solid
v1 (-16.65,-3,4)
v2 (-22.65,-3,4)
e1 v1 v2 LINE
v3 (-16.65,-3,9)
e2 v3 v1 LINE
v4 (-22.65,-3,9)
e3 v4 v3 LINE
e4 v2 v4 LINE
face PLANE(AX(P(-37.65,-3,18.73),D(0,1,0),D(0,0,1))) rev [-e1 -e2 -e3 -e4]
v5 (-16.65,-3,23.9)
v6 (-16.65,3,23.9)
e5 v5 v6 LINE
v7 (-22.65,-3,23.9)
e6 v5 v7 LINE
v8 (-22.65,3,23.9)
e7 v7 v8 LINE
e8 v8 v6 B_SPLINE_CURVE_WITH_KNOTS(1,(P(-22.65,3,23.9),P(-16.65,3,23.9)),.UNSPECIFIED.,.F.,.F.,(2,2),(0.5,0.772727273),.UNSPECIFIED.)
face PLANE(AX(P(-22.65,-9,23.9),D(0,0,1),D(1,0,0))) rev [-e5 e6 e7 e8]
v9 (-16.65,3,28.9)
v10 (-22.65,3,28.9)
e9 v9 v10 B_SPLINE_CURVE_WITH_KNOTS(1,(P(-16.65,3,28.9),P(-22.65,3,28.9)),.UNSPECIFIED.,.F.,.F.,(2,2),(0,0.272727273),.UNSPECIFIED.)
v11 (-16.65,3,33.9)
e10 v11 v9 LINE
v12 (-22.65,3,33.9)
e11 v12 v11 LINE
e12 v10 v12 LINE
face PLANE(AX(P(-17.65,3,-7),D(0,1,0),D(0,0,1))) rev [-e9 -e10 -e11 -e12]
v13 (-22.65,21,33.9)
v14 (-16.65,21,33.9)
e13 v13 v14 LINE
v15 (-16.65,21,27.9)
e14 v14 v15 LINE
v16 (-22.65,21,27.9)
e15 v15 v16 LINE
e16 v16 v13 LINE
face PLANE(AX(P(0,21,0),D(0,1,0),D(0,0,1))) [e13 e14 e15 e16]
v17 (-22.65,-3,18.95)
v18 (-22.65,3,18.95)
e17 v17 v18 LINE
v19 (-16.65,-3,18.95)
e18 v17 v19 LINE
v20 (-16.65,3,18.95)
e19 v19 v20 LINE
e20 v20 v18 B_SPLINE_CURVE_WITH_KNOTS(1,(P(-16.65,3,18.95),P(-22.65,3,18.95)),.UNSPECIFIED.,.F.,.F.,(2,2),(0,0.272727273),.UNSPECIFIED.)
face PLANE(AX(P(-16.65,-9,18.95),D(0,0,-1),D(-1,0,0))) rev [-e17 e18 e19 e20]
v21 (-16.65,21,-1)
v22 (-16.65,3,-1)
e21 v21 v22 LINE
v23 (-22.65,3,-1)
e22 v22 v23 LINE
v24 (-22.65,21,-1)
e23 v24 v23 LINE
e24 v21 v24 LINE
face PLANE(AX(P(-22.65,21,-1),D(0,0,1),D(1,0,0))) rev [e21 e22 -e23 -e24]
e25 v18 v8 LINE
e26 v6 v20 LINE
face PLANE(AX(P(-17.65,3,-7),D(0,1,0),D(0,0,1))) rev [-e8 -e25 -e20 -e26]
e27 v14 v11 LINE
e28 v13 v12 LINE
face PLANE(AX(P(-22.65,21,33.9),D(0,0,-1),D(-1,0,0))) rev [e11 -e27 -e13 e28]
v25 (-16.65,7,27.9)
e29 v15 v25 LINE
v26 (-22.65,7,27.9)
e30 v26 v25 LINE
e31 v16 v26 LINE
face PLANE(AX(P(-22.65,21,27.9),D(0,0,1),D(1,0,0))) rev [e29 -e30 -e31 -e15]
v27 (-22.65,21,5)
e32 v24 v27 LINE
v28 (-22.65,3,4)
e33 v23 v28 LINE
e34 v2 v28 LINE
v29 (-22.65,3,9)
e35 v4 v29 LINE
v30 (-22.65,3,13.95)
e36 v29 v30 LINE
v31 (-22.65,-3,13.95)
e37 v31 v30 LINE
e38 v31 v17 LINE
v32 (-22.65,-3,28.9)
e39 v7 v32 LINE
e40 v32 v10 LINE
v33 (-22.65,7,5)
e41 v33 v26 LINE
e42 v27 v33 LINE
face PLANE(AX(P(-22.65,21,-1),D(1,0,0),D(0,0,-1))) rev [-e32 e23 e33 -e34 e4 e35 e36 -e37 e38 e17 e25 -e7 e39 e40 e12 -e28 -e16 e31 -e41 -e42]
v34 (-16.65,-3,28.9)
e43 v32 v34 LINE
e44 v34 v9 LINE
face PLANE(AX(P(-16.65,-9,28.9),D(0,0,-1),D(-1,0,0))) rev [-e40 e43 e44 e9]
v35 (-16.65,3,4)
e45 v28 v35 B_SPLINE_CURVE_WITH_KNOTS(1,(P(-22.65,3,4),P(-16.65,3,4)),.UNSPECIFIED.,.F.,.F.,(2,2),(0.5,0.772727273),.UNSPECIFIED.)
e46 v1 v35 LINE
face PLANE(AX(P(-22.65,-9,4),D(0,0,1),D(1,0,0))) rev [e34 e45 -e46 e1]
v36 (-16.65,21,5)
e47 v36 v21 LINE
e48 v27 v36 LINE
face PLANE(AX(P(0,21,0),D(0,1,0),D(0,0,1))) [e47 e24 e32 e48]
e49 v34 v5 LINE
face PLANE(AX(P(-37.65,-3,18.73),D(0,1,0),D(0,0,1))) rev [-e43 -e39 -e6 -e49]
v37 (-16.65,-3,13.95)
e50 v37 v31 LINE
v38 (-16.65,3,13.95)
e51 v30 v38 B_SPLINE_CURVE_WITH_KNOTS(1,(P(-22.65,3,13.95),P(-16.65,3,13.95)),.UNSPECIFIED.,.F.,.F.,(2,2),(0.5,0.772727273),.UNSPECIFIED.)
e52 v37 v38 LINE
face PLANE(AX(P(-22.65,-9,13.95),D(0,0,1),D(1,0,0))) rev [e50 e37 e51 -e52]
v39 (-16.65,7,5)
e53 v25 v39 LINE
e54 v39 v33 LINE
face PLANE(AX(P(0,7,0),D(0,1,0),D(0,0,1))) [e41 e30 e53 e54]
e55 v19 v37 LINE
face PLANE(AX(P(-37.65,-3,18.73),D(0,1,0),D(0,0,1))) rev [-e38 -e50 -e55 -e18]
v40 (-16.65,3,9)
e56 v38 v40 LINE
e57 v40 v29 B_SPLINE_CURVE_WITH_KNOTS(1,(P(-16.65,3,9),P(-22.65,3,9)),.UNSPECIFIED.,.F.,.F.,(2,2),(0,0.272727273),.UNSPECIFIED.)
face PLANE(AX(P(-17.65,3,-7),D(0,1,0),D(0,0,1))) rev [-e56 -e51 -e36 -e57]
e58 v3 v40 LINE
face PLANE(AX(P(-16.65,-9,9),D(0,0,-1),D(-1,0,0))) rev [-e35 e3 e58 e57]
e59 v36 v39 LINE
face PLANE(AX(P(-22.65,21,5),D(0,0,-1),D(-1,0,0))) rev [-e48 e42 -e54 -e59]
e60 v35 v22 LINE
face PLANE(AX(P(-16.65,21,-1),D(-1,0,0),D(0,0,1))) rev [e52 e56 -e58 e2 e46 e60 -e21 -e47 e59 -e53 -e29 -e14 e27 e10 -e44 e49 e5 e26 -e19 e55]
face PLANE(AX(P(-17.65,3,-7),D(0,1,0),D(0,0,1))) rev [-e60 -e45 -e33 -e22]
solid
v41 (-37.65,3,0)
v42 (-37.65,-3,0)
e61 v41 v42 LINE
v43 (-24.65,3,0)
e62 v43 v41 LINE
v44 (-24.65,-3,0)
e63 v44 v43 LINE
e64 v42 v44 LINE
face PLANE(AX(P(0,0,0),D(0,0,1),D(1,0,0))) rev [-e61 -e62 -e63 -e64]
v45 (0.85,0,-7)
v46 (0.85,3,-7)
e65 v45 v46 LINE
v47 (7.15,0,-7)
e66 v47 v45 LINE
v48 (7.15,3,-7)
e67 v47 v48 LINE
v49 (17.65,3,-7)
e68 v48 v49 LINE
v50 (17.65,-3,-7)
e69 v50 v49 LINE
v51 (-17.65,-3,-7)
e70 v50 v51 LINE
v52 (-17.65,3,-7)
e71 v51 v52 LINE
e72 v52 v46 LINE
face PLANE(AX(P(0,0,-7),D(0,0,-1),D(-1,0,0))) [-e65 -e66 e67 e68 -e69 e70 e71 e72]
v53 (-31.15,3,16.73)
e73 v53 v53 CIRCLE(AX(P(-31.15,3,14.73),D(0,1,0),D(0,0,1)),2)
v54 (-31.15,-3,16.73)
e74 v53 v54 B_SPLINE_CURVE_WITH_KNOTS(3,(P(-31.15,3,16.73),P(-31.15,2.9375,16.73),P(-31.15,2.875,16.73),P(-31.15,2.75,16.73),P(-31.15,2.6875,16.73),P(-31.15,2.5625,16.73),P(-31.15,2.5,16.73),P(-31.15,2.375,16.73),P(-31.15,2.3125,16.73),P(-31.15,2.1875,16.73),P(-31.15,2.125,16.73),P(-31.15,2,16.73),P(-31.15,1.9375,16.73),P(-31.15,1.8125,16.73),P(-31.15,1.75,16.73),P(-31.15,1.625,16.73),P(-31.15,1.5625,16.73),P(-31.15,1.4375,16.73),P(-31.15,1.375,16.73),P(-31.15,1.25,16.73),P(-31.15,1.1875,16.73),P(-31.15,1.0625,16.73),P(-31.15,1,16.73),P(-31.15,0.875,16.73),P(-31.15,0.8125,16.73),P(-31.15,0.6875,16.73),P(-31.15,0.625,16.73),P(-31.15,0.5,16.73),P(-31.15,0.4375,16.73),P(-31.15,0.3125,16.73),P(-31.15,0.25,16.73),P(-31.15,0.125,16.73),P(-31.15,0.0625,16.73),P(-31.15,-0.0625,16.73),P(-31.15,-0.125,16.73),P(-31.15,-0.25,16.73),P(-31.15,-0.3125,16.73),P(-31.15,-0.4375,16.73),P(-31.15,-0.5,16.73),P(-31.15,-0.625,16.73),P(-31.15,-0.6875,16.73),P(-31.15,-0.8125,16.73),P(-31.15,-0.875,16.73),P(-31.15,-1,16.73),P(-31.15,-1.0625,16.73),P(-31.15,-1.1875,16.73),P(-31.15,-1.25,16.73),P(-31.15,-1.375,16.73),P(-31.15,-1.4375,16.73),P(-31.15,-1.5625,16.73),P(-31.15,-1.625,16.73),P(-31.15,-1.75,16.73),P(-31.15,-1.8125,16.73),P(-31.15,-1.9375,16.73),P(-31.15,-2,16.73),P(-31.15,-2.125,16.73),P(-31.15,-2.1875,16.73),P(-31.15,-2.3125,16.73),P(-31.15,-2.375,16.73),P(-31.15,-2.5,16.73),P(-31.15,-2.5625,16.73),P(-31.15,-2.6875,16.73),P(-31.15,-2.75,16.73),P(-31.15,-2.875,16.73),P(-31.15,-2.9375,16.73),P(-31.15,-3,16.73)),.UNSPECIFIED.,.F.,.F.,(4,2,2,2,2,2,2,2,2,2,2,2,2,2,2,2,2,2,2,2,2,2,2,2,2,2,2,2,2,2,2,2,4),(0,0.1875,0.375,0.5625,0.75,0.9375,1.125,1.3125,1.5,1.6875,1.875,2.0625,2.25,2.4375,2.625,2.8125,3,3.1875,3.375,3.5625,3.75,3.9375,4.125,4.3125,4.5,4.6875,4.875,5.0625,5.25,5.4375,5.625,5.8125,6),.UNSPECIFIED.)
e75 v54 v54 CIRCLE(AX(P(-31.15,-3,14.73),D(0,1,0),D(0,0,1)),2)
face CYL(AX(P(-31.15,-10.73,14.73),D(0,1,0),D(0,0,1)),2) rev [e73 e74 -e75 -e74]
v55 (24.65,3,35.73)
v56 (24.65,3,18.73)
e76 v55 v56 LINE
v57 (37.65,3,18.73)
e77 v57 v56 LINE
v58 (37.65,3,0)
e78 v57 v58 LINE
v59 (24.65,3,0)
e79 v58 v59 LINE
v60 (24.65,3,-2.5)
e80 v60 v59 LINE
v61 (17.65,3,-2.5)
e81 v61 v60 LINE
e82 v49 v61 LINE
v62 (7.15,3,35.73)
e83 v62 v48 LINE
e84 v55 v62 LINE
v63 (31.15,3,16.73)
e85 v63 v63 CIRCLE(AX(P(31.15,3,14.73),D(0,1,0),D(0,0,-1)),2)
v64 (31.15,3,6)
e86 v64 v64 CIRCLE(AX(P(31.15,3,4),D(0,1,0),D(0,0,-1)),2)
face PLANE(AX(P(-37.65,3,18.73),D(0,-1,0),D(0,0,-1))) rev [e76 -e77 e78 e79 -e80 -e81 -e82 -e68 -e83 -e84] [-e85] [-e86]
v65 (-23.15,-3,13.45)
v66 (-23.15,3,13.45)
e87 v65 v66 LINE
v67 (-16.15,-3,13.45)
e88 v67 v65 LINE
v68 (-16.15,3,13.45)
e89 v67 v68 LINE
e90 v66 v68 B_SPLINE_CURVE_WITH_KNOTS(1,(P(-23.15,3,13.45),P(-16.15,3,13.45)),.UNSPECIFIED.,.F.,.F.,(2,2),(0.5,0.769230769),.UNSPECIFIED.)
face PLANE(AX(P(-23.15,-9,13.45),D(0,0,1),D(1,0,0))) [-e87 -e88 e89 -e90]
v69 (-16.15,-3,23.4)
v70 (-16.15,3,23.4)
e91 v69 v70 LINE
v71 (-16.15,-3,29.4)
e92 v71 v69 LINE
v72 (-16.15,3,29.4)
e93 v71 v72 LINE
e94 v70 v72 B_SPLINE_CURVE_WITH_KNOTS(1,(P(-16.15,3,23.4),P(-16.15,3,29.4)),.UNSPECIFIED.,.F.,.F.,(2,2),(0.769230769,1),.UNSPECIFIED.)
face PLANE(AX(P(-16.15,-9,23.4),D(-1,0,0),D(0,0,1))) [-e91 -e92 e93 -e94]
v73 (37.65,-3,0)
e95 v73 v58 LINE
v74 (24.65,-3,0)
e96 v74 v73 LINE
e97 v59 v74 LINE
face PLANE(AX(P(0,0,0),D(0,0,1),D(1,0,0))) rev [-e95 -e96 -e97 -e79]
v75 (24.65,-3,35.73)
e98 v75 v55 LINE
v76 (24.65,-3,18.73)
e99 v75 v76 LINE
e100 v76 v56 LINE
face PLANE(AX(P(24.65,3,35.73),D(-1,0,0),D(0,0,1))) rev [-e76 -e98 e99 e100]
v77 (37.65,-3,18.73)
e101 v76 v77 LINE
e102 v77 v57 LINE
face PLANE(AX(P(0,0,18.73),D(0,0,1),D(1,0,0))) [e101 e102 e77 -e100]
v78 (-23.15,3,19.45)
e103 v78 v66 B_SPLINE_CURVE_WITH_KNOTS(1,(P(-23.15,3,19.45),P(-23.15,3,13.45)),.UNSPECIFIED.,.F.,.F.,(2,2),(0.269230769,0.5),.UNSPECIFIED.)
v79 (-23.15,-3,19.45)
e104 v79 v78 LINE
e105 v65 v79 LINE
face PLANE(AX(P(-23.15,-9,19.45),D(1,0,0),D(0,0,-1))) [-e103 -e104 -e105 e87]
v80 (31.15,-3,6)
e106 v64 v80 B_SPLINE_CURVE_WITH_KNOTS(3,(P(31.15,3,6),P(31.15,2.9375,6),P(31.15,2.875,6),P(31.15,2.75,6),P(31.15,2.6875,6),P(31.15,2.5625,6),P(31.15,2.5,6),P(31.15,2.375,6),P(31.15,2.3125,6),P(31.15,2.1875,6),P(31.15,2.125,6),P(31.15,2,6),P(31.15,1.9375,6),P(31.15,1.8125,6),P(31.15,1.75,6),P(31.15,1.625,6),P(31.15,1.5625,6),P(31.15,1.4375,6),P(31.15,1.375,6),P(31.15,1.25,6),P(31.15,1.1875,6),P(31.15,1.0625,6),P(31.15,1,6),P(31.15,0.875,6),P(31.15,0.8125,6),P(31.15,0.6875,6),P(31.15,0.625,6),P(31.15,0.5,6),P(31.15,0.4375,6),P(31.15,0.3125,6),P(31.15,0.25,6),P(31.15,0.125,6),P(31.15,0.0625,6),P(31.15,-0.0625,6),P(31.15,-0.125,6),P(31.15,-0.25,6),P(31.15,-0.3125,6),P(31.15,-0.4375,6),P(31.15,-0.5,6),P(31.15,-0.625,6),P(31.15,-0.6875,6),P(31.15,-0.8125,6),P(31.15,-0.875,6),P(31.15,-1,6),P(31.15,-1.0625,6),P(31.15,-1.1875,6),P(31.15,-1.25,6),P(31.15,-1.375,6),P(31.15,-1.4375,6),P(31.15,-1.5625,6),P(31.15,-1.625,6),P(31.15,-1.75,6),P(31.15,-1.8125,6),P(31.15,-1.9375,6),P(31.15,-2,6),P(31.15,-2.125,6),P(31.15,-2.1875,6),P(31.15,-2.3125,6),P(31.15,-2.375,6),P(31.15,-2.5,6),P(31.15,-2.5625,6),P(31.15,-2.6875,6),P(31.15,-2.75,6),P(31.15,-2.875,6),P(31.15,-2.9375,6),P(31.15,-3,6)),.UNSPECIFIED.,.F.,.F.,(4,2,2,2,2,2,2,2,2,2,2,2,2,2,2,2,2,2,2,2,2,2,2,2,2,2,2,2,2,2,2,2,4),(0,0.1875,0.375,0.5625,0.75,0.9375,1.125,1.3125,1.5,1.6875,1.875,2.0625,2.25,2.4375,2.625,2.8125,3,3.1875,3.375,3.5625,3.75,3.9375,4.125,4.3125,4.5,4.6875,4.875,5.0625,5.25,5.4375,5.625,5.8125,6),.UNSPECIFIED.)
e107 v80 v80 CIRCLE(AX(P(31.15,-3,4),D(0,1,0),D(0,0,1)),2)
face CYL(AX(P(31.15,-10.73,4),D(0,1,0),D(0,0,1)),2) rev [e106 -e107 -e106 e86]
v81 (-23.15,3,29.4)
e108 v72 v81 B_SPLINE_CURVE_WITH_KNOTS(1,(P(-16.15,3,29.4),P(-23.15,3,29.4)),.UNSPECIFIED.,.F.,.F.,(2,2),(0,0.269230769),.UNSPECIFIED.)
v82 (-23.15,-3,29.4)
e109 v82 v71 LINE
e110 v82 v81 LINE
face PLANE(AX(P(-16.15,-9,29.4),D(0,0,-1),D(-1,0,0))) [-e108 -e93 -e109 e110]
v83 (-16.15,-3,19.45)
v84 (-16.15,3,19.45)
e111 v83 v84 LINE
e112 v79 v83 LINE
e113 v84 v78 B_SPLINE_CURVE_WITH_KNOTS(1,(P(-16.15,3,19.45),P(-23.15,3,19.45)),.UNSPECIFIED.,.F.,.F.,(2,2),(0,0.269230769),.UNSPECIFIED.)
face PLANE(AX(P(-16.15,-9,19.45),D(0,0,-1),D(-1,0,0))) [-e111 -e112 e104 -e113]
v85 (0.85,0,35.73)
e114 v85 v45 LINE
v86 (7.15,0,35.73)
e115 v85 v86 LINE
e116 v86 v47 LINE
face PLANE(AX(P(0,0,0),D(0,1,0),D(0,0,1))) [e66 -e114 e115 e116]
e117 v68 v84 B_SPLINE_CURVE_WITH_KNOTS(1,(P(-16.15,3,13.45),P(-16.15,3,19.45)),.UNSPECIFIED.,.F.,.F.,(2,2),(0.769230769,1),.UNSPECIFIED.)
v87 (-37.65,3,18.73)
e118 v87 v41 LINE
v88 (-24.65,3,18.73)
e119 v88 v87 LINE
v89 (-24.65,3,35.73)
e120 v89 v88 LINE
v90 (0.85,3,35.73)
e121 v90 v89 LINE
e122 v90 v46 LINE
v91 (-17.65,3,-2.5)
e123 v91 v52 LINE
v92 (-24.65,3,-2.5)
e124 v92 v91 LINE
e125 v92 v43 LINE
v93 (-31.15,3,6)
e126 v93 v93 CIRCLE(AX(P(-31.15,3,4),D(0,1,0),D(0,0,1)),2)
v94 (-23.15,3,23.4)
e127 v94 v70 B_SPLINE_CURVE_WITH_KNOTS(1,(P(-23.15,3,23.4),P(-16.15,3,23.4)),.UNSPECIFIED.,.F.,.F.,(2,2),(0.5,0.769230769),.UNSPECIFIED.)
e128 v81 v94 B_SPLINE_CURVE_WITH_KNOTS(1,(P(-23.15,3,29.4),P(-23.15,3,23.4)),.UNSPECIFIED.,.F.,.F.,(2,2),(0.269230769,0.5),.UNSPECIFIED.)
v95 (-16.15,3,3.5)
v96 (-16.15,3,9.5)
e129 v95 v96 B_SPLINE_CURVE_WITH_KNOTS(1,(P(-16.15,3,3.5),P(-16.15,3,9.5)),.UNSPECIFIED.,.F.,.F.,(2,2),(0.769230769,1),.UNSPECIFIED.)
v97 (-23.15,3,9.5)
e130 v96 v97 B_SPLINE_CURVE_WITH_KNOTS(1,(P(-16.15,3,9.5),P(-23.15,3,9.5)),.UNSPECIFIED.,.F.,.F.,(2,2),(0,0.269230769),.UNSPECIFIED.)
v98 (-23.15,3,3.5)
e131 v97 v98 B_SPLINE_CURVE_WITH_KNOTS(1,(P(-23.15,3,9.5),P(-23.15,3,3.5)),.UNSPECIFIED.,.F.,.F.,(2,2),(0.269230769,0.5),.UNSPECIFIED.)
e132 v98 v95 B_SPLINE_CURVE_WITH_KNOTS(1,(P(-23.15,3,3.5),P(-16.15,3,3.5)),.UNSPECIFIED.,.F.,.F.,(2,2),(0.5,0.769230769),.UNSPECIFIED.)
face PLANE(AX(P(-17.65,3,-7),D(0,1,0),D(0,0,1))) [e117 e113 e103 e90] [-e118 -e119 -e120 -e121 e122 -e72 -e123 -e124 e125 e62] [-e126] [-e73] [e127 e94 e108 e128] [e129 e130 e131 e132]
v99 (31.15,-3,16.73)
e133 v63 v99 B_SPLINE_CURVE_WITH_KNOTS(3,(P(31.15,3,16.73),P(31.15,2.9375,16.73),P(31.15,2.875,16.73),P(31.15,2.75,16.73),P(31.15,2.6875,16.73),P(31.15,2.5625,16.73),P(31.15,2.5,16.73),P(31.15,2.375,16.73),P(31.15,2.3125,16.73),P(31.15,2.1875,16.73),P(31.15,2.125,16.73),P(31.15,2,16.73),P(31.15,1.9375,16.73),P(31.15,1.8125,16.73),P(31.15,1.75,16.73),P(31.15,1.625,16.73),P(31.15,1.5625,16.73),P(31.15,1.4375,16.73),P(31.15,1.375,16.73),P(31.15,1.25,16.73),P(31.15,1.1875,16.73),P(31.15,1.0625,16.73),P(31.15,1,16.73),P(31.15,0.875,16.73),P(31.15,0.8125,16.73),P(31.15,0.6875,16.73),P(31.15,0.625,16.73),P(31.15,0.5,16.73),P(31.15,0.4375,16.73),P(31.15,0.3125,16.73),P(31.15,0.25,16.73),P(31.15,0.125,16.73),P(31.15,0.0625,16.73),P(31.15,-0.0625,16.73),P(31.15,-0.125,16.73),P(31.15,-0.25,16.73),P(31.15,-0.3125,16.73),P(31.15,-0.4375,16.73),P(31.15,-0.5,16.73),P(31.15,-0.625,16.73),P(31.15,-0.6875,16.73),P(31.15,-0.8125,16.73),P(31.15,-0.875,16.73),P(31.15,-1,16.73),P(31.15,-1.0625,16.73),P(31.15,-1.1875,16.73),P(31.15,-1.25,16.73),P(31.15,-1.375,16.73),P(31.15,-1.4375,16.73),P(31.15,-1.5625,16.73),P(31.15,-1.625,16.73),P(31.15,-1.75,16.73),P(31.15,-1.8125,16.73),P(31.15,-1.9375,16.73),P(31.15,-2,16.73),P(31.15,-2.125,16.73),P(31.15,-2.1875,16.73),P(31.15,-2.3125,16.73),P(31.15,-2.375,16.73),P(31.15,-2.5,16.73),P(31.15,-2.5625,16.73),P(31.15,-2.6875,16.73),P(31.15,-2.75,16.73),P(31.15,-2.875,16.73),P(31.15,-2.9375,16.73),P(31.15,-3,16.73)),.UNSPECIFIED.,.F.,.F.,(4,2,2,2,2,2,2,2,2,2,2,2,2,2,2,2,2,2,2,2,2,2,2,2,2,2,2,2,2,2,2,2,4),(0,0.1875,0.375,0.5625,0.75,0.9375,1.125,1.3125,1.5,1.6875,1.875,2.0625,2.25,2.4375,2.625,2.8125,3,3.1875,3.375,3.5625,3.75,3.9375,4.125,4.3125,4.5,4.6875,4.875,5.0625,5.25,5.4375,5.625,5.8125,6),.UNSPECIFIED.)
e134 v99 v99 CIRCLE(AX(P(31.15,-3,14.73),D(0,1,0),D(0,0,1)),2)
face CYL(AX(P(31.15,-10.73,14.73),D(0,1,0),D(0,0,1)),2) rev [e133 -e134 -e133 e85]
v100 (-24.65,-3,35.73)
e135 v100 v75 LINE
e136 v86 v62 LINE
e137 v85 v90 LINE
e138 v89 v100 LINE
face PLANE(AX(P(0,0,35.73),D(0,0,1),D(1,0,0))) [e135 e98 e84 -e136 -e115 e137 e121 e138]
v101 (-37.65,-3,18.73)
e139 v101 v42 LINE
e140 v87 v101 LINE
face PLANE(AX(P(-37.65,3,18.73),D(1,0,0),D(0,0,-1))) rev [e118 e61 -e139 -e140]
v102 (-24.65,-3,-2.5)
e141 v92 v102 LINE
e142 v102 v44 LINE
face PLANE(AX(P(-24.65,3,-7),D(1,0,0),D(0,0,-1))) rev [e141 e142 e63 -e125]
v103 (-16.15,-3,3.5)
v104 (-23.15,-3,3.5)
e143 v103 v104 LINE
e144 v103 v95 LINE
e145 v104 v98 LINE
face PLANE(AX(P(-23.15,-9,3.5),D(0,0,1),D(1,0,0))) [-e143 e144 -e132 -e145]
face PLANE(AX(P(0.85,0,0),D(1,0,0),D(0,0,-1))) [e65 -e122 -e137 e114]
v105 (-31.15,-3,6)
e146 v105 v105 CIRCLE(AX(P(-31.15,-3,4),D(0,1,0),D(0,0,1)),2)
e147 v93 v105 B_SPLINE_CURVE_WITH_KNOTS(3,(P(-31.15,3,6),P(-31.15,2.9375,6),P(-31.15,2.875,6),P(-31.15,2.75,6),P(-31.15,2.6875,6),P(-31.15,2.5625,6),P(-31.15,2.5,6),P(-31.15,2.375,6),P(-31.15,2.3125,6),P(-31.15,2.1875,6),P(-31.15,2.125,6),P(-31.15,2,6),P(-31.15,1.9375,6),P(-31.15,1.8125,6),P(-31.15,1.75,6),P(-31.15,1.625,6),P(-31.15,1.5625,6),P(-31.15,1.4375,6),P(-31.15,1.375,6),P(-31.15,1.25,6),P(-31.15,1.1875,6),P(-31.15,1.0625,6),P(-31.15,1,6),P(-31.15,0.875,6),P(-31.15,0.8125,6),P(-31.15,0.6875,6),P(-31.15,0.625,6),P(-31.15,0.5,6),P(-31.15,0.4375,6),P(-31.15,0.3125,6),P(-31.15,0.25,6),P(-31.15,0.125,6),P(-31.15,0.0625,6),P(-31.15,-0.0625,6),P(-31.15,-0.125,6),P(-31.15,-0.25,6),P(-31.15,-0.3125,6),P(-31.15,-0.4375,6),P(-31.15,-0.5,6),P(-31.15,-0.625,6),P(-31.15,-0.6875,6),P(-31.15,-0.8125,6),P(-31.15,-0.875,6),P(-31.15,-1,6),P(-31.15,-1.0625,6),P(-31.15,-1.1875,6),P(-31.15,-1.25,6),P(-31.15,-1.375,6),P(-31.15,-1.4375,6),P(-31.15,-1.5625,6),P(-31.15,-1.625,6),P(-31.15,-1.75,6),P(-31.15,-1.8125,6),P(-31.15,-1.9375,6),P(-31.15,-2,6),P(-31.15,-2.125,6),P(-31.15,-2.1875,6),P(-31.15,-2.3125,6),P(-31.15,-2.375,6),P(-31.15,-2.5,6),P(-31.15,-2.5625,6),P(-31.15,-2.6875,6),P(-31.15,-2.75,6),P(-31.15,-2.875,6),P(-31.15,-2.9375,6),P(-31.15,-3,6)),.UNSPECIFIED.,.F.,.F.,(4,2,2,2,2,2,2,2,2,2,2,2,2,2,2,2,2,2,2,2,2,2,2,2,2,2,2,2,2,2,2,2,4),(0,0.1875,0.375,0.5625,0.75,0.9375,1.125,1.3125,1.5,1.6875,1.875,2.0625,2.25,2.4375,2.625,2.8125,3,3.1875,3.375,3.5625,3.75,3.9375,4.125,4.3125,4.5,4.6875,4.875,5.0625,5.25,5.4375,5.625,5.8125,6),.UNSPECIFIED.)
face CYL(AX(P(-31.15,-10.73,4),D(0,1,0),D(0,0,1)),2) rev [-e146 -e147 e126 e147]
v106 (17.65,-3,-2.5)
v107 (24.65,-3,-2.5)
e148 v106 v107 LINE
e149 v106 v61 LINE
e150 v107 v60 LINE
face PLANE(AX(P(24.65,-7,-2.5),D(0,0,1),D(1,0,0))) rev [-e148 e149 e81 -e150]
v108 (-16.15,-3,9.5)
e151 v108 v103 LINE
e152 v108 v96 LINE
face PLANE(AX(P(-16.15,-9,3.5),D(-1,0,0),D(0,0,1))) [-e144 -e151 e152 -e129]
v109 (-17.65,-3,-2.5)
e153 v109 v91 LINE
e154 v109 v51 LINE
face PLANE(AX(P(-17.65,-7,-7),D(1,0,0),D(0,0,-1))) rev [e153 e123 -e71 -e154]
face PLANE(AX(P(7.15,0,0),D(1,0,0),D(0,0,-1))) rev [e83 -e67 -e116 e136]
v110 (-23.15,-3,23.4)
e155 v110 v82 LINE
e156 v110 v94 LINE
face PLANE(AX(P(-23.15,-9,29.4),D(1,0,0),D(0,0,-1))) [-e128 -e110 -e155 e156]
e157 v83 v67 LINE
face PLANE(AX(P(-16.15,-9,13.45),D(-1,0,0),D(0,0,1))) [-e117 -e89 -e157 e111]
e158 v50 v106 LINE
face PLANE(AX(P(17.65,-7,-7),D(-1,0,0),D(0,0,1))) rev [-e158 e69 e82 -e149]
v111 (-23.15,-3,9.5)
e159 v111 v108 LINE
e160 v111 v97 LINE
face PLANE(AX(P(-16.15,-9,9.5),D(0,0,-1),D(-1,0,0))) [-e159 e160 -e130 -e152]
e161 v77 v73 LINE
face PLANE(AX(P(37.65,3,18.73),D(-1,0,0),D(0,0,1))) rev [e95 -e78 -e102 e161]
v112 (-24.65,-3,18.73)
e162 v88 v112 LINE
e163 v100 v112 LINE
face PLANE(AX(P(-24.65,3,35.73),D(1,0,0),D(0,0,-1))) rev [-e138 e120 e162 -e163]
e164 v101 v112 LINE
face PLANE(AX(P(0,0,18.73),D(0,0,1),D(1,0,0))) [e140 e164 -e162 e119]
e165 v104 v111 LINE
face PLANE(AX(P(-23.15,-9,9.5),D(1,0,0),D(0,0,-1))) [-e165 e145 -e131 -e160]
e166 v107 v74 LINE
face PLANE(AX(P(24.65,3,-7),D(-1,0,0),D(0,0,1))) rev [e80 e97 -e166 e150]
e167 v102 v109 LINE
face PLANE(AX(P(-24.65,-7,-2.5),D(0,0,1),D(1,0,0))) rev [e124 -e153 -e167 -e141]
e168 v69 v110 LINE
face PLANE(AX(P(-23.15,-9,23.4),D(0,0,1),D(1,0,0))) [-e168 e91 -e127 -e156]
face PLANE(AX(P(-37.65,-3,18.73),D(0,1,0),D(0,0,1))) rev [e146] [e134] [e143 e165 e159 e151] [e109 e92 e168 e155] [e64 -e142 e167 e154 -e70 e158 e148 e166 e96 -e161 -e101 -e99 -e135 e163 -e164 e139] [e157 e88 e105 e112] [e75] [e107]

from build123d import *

# Parameters (mm, degrees)
SKETCH_2_W          = 75.3
SKETCH_2_H          = 6
EXTRUDE_1_DEPTH     = 18.73
SKETCH_3_R          = 2
CUT_EXTRUDE_1_DEPTH = 13.73
SKETCH_4_W          = 49.3
SKETCH_4_H          = 6
EXTRUDE_3_DEPTH     = 17
SKETCH_6_W          = 49.3
SKETCH_6_H          = 6
EXTRUDE_5_DEPTH     = 7
SKETCH_7_W          = 6
SKETCH_7_H          = 6
EXTRUDE_6_DEPTH     = 18
SKETCH_8_W          = 6.3
SKETCH_8_H          = 42.73
CUT_EXTRUDE_2_DEPTH = 3
SKETCH_9_W          = 7
SKETCH_9_H          = 4.5
CUT_EXTRUDE_3_DEPTH = 10
SKETCH_10_W         = 6
SKETCH_10_H         = 22.9
EXTRUDE_7_DEPTH     = 4
OTHER_START         = -22.65
OTHER_1_OUTLINE_W   = 6
OTHER_1_OUTLINE_H   = 5
OTHER_1_DEPTH       = 6
OTHER_START_2       = -23.15
OTHER_1_2_OUTLINE_W = 6
OTHER_1_2_OUTLINE_H = 6
OTHER_1_2_DEPTH     = 7


# Read off the part's stored shape, not the designer's step: Разделить1, Выступы и прорези-Выступ1, Выступы и прорези-Прорезь1
with BuildPart() as part:
    # Эскиз2 → Бобышка-Вытянуть1 (new body)
    with BuildSketch(Plane.XY):
        Rectangle(SKETCH_2_W, SKETCH_2_H)
    extrude(amount=EXTRUDE_1_DEPTH)

    # Эскиз3 → Вырез-Вытянуть1 (cut)
    with BuildSketch(Plane(origin=(0, 3, 0), x_dir=(1, 0, 0), z_dir=(0, 1, 0))):
        with Locations(Location((-31.15, -4, 0), (0, 0, 270))):
            Circle(SKETCH_3_R)
        with Locations(Location((-31.15, -14.73, 0), (0, 0, 270))):
            Circle(SKETCH_3_R)
        with Locations(Location((31.15, -14.73, 0), (0, 0, 270))):
            Circle(SKETCH_3_R)
        with Locations(Location((31.15, -4, 0), (0, 0, 270))):
            Circle(SKETCH_3_R)
    extrude(amount=-CUT_EXTRUDE_1_DEPTH, mode=Mode.SUBTRACT)

    # Эскиз4 → Бобышка-Вытянуть3 (add)
    with BuildSketch(Plane.XY.offset(18.73)):
        Rectangle(SKETCH_4_W, SKETCH_4_H)
    extrude(amount=EXTRUDE_3_DEPTH)

    # Эскиз6 → Бобышка-Вытянуть5 (add)
    with BuildSketch(Plane(origin=(0, 0, 0), x_dir=(-1, 0, 0), z_dir=(0, 0, -1))):
        Rectangle(SKETCH_6_W, SKETCH_6_H)
    extrude(amount=EXTRUDE_5_DEPTH)

    # Эскиз7 → Бобышка-Вытянуть6 (add)
    with BuildSketch(Plane(origin=(0, 3, 0), x_dir=(1, 0, 0), z_dir=(0, 1, 0))):
        with Locations((-19.65, -2)):
            Rectangle(SKETCH_7_W, SKETCH_7_H)
        with Locations((-19.65, -30.9)):
            Rectangle(SKETCH_7_W, SKETCH_7_H)
    extrude(amount=EXTRUDE_6_DEPTH)

    # Эскиз8 → Вырез-Вытянуть2 (cut)
    with BuildSketch(Plane(origin=(0, 3, -43.99), x_dir=(-1, 0, 0), z_dir=(0, 1, 0))):
        with Locations((-4, 58.355)):
            Rectangle(SKETCH_8_W, SKETCH_8_H)
    extrude(amount=-CUT_EXTRUDE_2_DEPTH, mode=Mode.SUBTRACT)

    # Эскиз9 → Вырез-Вытянуть3 (cut)
    with BuildSketch(Plane(origin=(0, 3, 0), x_dir=(1, 0, 0), z_dir=(0, 1, 0))):
        with Locations((-21.15, 4.75)):
            Rectangle(SKETCH_9_W, SKETCH_9_H)
        with Locations((21.15, 4.75)):
            Rectangle(SKETCH_9_W, SKETCH_9_H)
    extrude(amount=-CUT_EXTRUDE_3_DEPTH, mode=Mode.SUBTRACT)

    # Эскиз10 → Бобышка-Вытянуть7 (add)
    with BuildSketch(Plane(origin=(0, 3, 0), x_dir=(1, 0, 0), z_dir=(0, 1, 0))):
        with Locations((-19.65, -16.45)):
            Rectangle(SKETCH_10_W, SKETCH_10_H)
    extrude(amount=EXTRUDE_7_DEPTH)


with BuildPart() as body_2:
    # Split Bodies 1: the piece on the far side of the plane
    add(part.part)
    split(bisect_by=Plane(origin=(0, 3, 0), x_dir=(1, 0, 0), z_dir=(0, 1, 0)), keep=Keep.BOTTOM)

    # Other 1 2 outline → Other 1 2 (cut)
    with BuildSketch(Plane.YZ.offset(OTHER_START_2)):
        with Locations((0, 26.4)):
            Rectangle(OTHER_1_2_OUTLINE_W, OTHER_1_2_OUTLINE_H)
        with Locations((0, 16.45)):
            Rectangle(OTHER_1_2_OUTLINE_W, OTHER_1_2_OUTLINE_H)
        with Locations((0, 6.5)):
            Rectangle(OTHER_1_2_OUTLINE_W, OTHER_1_2_OUTLINE_H)
    extrude(amount=OTHER_1_2_DEPTH, mode=Mode.SUBTRACT)


with BuildPart() as part_1:
    add(part.part)

    # Split Bodies 1
    split(bisect_by=Plane(origin=(0, 3, 0), x_dir=(1, 0, 0), z_dir=(0, 1, 0)), keep=Keep.TOP)

    # Other 1 outline → Other 1 (add)
    with BuildSketch(Plane.YZ.offset(OTHER_START)):
        with Locations((0, 6.5)):
            Rectangle(OTHER_1_OUTLINE_W, OTHER_1_OUTLINE_H)
        with Locations((0, 16.45)):
            Rectangle(OTHER_1_OUTLINE_W, OTHER_1_OUTLINE_H)
        with Locations((0, 26.4)):
            Rectangle(OTHER_1_OUTLINE_W, OTHER_1_OUTLINE_H)
    extrude(amount=OTHER_1_DEPTH)


solid = Compound([body_2.part, part_1.part])
